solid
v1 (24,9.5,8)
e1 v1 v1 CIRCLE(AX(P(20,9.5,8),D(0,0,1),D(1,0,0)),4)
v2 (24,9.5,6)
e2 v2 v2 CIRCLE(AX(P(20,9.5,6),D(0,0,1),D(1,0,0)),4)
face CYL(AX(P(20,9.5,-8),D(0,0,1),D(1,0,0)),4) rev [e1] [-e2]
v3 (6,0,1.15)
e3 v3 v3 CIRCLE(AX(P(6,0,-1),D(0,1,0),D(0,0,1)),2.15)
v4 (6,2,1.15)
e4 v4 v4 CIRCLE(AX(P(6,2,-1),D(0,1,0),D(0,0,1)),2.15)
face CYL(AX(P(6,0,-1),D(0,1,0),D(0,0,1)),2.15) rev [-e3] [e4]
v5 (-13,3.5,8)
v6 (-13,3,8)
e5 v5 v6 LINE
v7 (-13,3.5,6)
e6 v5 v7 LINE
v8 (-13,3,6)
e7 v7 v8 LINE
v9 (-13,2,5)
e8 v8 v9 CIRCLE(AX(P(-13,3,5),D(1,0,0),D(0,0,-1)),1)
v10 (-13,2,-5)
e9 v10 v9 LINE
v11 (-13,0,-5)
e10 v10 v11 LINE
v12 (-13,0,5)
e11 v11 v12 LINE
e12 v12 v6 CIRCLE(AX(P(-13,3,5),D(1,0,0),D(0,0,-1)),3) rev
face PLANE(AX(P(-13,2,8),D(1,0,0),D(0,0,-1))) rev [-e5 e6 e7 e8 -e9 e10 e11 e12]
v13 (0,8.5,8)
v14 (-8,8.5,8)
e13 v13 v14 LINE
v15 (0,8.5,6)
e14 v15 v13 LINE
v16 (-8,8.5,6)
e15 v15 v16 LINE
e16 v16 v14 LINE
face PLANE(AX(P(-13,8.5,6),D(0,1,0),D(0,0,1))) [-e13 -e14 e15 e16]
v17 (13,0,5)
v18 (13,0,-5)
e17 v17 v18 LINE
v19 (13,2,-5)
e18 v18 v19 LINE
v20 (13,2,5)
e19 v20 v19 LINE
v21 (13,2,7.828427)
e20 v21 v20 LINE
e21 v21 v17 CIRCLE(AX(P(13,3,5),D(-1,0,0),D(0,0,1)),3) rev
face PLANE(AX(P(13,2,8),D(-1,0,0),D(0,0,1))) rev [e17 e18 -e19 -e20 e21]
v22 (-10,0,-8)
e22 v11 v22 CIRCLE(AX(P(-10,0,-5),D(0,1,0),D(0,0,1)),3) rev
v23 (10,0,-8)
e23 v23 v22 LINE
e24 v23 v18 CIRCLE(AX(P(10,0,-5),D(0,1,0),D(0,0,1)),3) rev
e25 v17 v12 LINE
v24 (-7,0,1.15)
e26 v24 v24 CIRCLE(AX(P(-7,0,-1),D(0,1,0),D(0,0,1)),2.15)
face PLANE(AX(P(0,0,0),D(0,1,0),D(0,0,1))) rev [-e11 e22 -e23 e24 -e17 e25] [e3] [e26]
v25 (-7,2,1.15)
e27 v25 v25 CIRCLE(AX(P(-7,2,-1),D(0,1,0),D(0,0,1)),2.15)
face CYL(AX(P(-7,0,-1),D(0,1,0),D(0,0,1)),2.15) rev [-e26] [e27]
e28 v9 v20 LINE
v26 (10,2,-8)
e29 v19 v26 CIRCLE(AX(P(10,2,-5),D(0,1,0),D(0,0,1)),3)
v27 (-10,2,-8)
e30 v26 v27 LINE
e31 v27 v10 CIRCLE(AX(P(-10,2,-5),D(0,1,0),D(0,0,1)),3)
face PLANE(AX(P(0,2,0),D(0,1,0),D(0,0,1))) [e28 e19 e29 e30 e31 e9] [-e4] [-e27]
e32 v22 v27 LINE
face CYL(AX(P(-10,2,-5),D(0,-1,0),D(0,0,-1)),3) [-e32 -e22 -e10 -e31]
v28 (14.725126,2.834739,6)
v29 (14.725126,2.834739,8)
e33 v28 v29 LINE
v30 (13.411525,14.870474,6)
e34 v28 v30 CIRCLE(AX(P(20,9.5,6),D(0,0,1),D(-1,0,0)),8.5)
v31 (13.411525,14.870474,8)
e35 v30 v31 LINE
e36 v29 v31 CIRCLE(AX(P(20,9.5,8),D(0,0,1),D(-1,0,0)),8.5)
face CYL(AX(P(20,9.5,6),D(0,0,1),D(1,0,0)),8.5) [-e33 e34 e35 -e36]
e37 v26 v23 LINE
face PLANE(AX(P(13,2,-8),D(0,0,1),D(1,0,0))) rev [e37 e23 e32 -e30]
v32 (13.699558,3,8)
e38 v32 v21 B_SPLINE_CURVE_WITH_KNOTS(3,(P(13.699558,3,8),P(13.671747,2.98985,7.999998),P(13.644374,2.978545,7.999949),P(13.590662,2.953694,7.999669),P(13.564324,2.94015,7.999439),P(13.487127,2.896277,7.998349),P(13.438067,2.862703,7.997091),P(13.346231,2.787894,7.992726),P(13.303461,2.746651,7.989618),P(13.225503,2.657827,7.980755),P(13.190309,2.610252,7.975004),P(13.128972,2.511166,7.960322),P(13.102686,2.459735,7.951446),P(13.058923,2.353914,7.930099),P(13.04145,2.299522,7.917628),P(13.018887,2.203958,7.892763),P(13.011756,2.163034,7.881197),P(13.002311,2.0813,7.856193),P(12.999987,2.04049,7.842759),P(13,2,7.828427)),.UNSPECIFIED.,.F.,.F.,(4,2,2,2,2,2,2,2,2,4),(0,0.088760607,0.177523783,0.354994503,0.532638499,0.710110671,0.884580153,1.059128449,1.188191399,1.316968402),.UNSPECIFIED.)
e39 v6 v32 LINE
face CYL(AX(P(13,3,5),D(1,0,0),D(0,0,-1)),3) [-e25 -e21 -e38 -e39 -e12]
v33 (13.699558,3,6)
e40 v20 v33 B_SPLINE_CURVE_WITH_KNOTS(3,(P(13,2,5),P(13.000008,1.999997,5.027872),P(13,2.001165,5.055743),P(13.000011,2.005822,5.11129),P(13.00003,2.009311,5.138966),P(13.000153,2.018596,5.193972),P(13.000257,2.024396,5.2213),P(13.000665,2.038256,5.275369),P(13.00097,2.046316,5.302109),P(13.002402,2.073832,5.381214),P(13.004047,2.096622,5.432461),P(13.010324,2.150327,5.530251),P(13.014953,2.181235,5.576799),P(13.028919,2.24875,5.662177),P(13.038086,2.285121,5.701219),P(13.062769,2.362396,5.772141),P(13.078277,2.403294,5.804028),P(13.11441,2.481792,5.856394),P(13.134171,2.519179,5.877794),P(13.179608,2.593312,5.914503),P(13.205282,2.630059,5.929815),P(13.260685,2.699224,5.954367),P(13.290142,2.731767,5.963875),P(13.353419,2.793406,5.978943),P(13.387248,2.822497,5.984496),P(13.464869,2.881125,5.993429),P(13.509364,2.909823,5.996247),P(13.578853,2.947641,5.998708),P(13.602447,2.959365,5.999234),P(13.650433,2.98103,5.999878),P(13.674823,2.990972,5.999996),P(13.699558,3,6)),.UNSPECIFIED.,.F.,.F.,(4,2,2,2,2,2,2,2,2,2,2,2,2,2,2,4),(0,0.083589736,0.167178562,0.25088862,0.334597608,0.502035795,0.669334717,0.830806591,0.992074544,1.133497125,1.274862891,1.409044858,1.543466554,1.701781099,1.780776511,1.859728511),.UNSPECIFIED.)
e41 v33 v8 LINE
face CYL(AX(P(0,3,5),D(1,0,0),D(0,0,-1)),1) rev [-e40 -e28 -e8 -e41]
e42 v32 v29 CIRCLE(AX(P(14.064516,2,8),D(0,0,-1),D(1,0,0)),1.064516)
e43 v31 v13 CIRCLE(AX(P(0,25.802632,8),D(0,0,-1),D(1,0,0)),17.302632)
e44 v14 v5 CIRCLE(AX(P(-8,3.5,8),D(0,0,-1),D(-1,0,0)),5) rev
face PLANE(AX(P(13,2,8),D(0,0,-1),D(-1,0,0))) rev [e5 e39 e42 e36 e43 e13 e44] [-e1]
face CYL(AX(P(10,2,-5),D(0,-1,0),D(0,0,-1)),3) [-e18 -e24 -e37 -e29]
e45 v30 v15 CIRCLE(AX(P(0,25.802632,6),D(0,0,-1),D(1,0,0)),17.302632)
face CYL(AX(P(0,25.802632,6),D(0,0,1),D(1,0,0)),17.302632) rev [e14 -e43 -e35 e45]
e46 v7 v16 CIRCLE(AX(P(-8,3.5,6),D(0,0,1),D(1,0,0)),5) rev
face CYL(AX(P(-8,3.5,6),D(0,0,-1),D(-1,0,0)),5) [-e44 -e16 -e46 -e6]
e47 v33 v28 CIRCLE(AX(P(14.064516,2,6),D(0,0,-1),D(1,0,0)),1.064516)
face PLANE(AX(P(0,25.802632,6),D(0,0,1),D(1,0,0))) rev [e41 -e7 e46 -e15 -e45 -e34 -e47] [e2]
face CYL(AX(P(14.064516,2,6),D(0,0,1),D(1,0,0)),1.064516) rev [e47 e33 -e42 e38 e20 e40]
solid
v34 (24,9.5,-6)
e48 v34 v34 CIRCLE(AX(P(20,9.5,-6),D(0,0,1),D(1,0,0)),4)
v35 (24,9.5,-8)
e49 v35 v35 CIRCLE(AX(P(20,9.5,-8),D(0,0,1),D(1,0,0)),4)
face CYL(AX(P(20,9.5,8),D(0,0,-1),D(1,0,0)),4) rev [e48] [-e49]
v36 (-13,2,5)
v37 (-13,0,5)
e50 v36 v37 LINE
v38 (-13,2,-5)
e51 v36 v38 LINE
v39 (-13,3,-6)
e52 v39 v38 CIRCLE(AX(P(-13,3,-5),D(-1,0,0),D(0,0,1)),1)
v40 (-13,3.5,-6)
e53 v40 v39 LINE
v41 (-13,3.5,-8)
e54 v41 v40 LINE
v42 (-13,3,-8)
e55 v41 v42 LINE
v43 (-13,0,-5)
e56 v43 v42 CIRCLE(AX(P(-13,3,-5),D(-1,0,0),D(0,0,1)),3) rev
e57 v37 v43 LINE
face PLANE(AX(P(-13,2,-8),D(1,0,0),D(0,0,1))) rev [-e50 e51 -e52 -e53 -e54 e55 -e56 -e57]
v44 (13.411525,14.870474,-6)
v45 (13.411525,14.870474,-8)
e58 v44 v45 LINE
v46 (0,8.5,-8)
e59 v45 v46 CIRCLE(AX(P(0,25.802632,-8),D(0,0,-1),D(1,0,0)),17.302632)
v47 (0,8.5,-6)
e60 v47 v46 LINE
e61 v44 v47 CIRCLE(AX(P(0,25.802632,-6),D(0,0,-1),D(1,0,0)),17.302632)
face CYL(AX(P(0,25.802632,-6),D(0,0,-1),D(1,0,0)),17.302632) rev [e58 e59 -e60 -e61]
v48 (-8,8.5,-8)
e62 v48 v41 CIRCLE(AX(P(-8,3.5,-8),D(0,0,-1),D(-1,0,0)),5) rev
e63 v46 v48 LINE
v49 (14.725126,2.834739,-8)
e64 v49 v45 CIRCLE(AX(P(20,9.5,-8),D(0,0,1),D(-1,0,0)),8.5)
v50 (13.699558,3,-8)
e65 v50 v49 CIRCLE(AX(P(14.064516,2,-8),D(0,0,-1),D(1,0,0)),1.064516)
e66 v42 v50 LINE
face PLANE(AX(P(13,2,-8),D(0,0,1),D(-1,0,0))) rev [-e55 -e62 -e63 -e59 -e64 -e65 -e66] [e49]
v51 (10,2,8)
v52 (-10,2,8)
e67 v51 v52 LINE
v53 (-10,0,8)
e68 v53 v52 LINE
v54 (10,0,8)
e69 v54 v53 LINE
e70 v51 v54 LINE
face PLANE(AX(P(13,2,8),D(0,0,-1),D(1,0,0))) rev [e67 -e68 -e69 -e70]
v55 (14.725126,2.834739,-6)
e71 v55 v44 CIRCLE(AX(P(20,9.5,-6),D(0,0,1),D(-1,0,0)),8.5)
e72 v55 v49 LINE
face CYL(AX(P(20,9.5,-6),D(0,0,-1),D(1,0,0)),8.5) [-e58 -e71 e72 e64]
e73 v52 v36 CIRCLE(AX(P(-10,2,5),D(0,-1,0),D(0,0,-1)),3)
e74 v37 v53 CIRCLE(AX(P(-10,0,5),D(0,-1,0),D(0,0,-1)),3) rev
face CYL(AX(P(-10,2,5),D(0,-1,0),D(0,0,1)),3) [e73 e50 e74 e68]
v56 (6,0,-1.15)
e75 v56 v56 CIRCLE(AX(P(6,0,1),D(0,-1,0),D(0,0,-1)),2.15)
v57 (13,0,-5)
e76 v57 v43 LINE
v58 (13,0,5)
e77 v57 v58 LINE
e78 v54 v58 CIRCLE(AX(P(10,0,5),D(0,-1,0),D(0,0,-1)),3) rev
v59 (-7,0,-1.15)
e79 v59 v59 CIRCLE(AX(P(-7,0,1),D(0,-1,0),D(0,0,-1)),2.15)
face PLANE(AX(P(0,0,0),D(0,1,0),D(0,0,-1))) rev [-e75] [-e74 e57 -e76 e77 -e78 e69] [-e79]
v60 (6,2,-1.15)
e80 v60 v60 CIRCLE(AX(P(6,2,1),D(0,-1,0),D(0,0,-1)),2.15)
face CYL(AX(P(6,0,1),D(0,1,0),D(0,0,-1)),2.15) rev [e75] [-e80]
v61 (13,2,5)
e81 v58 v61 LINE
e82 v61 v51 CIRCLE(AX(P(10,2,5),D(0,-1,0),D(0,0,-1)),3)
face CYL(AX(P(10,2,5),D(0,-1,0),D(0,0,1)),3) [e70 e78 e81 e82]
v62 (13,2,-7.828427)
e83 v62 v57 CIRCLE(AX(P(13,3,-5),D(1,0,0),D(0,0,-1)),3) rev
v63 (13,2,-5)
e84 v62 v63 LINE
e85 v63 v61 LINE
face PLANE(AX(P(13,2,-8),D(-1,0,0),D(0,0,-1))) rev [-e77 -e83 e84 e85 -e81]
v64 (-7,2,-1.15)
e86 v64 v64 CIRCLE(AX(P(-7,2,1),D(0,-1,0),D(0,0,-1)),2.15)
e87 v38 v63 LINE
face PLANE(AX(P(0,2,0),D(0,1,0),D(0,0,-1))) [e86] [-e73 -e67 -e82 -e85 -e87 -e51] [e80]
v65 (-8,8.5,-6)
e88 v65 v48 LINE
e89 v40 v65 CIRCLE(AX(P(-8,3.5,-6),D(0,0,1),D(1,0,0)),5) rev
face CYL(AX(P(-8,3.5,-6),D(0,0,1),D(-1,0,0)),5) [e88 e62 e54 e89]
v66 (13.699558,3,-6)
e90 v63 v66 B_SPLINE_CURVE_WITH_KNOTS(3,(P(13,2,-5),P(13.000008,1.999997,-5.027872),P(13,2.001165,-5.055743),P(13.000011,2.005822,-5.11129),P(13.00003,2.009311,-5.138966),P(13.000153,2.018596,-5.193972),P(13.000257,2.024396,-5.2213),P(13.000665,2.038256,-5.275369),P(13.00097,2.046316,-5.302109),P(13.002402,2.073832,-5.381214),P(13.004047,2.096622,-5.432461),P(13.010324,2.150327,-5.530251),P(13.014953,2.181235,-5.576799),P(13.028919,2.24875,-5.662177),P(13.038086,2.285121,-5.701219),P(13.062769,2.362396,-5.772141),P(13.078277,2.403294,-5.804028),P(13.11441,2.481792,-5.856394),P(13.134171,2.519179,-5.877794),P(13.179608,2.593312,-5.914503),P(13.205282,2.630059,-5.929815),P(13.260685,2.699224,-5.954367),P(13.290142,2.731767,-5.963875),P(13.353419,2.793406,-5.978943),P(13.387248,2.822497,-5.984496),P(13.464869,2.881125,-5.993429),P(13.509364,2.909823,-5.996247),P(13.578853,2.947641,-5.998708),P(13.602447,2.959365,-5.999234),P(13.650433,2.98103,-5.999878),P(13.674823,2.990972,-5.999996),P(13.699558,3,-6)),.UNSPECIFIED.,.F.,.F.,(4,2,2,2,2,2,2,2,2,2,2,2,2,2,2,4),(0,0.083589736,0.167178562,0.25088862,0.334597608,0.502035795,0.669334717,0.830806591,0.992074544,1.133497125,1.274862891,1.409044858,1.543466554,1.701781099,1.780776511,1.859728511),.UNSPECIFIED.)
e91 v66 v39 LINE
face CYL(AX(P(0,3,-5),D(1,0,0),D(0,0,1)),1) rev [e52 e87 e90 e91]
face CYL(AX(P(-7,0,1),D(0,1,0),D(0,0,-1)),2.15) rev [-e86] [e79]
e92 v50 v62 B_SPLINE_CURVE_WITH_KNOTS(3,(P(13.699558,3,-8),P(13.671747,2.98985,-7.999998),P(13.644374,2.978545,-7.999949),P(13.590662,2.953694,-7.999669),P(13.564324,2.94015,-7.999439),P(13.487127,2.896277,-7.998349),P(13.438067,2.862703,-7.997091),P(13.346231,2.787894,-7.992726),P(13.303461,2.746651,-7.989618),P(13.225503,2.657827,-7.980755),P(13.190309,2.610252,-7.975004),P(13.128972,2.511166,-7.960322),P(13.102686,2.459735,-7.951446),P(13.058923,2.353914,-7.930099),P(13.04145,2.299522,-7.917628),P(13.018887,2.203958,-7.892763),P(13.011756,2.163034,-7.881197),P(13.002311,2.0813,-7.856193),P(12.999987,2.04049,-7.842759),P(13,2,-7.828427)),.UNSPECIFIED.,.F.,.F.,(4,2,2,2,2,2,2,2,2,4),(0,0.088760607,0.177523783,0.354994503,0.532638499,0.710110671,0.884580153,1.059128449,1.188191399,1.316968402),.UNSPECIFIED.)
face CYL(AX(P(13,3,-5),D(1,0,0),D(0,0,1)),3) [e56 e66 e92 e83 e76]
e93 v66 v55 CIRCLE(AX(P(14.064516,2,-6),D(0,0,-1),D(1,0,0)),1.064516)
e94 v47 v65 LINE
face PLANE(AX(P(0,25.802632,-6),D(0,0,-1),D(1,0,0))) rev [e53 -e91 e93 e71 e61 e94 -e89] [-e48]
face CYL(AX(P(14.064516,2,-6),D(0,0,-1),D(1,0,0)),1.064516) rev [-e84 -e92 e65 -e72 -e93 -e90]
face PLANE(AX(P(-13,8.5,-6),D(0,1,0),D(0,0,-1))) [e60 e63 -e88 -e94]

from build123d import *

# Parameters (mm, degrees)
SKETCH_1_W          = 26
SKETCH_1_H          = 16
EXTRUDE_1_DEPTH     = 2
EXTRUDE_2_DEPTH     = 2
FILLET_1_R          = 5
FILLET_2_R          = 3
SKETCH_4_R          = 4
CUT_EXTRUDE_1_DEPTH = 38.312866414
SKETCH_5_R          = 2.15
CUT_EXTRUDE_2_DEPTH = 34.648922717
FILLET_3_R          = 3
FILLET_START        = -13
FILLET_4_DEPTH      = 26.69955789
FILLET_START_2      = 4
FILLET_4_2_DEPTH    = 2


with BuildPart() as part:
    # 草图1 → 凸台-拉伸1 (new body)
    with BuildSketch(Plane(origin=(0, 0, 0), x_dir=(1, 0, 0), z_dir=(0, 1, 0))):
        Rectangle(SKETCH_1_W, SKETCH_1_H)
    extrude(amount=EXTRUDE_1_DEPTH)

    # 草图3 → 凸台-拉伸2 (add)
    with BuildSketch(Plane.XY.offset(8)):
        with BuildLine():
            Line((-13, 2), (-13, 8.5))
            Line((-13, 8.5), (0, 8.5))
            ThreePointArc((0, 8.5), (7.423811989, 10.173553708), (13.411524732, 14.870474248))
            ThreePointArc((13.411524732, 14.870474248), (28.449822139, 10.422228722), (14.725126476, 2.834738617))
            ThreePointArc((14.725126476, 2.834738617), (13.600854496, 2.958234042), (13, 2))
            Line((13, 2), (-13, 2))
        make_face()
    extrude(amount=-EXTRUDE_2_DEPTH)

    # 圆角1
    fillet_1_edges = [part.edges().sort_by_distance(p)[0] for p in [
        (-13, 8.5, 7),
    ]]
    fillet(fillet_1_edges, radius=FILLET_1_R)

    # 圆角2
    fillet_2_edges = [part.edges().sort_by_distance(p)[0] for p in [
        (-13, 1, -8),
        (13, 1, -8),
    ]]
    fillet(fillet_2_edges, radius=FILLET_2_R)

    # 草图4 → 切除-拉伸1 (cut, through all)
    with BuildSketch(Plane.XY.offset(8)):
        with Locations((20, 9.5)):
            Circle(SKETCH_4_R)
    extrude(amount=-CUT_EXTRUDE_1_DEPTH, mode=Mode.SUBTRACT)

    # 草图5 → 切除-拉伸2 (cut, through all)
    with BuildSketch(Plane(origin=(0, 2, 0), x_dir=(1, 0, 0), z_dir=(0, 1, 0))):
        with Locations(Location((-7, 1, 0), (0, 0, 270))):
            Circle(SKETCH_5_R)
        with Locations(Location((6, 1, 0), (0, 0, 270))):
            Circle(SKETCH_5_R)
    extrude(amount=-CUT_EXTRUDE_2_DEPTH, mode=Mode.SUBTRACT)

    # 圆角3
    fillet_3_edges = [part.edges().sort_by_distance(p)[0] for p in [
        (0, 0, 8),
    ]]
    fillet(fillet_3_edges, radius=FILLET_3_R)

    # 圆角4: read off the stored shape, not the designer's step
    # 圆角4 outline → 圆角4 (add)
    with BuildSketch(Plane.YZ.offset(FILLET_START)):
        with BuildLine():
            ThreePointArc((2, 5), (2.292893219, 5.707106781), (3, 6))
            Line((3, 6), (2, 6))
            Line((2, 6), (2, 5))
        make_face()
    extrude(amount=FILLET_4_DEPTH)

    # Fillet 4 2 outline → Fillet 4 2 (cut)
    with BuildSketch(Plane.XY.offset(FILLET_START_2)):
        with BuildLine():
            Line((13.69955789, 2), (13.699557878, 3.000000032))
            ThreePointArc((13.699557878, 3.000000032), (13.19224914, 2.610200695), (13, 1.999999133))
            Line((13, 1.999999133), (13.69955789, 2))
        make_face()
    extrude(amount=FILLET_4_2_DEPTH, mode=Mode.SUBTRACT)


with BuildPart() as body_2:
    # 镜向1: mirrored copy
    add(part.part.mirror(Plane.XY))


solid = Compound([part.part, body_2.part])
